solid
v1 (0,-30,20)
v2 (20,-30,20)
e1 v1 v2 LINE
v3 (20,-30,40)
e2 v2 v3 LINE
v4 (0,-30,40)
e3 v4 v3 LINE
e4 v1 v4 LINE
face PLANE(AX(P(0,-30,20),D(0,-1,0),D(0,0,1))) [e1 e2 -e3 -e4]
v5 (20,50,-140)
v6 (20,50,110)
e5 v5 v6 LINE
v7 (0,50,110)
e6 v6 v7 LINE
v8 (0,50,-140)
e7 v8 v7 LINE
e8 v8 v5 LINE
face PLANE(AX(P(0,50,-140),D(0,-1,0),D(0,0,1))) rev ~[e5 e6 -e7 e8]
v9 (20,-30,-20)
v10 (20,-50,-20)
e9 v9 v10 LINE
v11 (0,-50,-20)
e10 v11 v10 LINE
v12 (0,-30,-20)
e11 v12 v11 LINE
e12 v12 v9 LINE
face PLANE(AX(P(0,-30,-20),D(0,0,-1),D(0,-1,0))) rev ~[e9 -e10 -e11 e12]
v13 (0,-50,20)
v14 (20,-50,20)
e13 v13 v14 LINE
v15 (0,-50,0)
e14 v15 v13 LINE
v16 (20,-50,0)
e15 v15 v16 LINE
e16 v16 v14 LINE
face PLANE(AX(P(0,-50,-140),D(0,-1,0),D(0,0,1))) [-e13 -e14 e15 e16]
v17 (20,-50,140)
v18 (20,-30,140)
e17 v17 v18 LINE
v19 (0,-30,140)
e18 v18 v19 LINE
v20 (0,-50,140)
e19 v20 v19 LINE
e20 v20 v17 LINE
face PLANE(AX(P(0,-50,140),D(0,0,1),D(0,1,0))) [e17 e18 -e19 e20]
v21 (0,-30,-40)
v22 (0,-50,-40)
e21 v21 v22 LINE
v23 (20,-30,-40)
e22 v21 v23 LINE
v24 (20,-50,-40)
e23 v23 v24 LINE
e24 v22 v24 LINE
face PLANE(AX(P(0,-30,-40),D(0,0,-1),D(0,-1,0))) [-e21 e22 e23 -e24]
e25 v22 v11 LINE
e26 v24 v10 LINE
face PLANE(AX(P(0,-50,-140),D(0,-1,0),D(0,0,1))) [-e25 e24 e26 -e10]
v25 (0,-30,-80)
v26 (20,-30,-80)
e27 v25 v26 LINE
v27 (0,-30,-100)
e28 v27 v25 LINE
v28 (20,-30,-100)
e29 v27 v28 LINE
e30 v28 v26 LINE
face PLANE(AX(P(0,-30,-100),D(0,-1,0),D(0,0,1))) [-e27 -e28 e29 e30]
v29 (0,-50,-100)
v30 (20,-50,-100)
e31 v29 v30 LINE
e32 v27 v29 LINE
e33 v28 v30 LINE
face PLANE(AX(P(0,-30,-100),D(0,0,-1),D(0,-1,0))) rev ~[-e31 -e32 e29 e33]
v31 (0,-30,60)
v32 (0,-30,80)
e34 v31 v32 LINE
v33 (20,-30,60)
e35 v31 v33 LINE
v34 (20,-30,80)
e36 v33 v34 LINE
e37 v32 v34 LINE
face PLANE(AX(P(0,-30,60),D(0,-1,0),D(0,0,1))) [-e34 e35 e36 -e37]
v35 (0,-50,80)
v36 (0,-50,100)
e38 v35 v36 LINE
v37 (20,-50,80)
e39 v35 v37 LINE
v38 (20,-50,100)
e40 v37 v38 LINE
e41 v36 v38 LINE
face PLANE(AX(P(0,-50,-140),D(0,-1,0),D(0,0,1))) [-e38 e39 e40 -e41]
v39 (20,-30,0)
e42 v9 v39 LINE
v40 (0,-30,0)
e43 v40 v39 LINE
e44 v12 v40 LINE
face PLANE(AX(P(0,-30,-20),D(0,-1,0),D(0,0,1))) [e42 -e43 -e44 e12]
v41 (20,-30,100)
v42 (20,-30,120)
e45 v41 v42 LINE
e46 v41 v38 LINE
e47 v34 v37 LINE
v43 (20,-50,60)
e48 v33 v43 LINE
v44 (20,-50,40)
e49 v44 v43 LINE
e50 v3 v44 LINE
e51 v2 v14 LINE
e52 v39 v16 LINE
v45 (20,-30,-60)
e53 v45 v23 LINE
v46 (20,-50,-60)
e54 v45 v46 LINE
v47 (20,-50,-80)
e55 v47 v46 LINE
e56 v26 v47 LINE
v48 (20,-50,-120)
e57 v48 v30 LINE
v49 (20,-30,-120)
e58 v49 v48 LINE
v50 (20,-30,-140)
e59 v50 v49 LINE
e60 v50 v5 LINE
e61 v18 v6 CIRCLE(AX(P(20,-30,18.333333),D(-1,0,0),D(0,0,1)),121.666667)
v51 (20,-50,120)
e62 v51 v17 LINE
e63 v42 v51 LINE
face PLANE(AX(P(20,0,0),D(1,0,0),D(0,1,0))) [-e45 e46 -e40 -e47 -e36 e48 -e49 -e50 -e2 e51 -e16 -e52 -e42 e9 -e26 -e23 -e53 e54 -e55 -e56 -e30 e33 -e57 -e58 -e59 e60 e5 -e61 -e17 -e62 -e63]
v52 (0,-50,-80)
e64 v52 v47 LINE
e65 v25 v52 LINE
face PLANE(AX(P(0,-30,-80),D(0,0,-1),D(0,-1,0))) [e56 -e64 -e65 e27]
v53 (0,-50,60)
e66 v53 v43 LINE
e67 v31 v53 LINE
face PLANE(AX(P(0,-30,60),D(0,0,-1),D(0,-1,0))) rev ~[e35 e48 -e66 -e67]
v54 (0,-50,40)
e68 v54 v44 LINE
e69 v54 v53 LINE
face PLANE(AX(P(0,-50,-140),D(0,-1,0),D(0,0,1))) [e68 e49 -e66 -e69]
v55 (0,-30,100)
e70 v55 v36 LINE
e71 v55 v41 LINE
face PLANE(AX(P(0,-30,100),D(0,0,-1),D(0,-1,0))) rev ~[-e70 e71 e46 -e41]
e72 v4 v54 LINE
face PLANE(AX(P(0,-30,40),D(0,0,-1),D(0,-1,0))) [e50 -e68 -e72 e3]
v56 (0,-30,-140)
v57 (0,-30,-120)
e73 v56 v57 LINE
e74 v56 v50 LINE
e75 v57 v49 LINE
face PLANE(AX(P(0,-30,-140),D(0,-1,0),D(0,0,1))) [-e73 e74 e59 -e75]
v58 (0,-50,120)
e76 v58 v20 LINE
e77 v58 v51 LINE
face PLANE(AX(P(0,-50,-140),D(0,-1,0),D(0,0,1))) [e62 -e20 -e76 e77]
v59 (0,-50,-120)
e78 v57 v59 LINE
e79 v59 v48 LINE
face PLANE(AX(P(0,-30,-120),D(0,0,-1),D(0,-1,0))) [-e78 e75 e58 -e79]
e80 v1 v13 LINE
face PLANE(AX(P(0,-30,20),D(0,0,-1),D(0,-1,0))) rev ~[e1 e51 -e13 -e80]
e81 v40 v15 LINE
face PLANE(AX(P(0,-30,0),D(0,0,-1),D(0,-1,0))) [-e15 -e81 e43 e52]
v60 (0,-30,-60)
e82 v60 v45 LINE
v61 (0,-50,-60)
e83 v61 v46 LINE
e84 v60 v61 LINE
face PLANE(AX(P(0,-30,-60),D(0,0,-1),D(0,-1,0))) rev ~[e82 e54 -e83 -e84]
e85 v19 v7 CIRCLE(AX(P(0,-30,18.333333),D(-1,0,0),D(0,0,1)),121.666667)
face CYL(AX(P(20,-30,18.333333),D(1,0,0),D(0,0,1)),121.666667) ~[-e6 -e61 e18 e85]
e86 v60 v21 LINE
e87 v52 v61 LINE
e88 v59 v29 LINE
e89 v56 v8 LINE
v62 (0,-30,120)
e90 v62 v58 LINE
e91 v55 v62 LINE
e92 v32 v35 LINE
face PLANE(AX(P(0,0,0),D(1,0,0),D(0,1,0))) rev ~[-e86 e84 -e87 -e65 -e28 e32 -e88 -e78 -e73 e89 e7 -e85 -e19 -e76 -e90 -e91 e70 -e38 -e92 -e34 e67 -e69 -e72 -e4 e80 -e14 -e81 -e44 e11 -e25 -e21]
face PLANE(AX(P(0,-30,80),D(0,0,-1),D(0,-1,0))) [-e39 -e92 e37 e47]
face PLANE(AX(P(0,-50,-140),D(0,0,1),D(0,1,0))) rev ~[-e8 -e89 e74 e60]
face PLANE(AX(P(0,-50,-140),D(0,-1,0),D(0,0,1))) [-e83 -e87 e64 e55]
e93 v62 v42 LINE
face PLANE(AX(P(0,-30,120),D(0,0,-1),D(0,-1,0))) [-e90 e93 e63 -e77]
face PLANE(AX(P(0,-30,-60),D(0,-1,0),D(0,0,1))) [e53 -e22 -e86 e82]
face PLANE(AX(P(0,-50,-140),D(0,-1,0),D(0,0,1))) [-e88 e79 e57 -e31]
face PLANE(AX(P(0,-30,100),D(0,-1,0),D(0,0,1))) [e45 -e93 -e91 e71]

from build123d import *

# Parameters (mm, degrees)
F0_W     = 100
F0_H     = 280
F1_DEPTH = 20
F3_DEPTH = 20
F4_W     = 20
F4_H     = 20
F5_DEPTH = 20


# Not quite as in the source:
# - a feature names something its author has since deleted; it is built from what else it names


with BuildPart() as f1:
    # F0 (on Right) → F1 (new body)
    with BuildSketch(Plane.YZ):
        Rectangle(F0_W, F0_H)
    extrude(amount=F1_DEPTH)

    # F2 (on face) → F3 (cut, through all)
    with BuildSketch(Plane.YZ.offset(20)):
        with BuildLine():
            ThreePointArc((-30, 140), (12.7200187266, 132.2533832709), (50, 110))
            Line((50, 110), (50, 140))
            Line((50, 140), (-30, 140))
        make_face()
    extrude(amount=-F3_DEPTH, mode=Mode.SUBTRACT)

    # F4 (on face) → F5 (cut, through all)
    with BuildSketch(Plane(origin=(0, 0, 0), x_dir=(0, -1, 0), z_dir=(-1, 0, 0))):
        with Locations((40, -130)):
            Rectangle(F4_W, F4_H)
        with Locations((40, -90)):
            Rectangle(F4_W, F4_H)
        with Locations((40, -50)):
            Rectangle(F4_W, F4_H)
        with Locations((40, -10)):
            Rectangle(F4_W, F4_H)
        with Locations((40, 30)):
            Rectangle(F4_W, F4_H)
        with Locations((40, 70)):
            Rectangle(F4_W, F4_H)
        with Locations((40, 110)):
            Rectangle(F4_W, F4_H)
    extrude(amount=-F5_DEPTH, mode=Mode.SUBTRACT)


solid = f1.part
